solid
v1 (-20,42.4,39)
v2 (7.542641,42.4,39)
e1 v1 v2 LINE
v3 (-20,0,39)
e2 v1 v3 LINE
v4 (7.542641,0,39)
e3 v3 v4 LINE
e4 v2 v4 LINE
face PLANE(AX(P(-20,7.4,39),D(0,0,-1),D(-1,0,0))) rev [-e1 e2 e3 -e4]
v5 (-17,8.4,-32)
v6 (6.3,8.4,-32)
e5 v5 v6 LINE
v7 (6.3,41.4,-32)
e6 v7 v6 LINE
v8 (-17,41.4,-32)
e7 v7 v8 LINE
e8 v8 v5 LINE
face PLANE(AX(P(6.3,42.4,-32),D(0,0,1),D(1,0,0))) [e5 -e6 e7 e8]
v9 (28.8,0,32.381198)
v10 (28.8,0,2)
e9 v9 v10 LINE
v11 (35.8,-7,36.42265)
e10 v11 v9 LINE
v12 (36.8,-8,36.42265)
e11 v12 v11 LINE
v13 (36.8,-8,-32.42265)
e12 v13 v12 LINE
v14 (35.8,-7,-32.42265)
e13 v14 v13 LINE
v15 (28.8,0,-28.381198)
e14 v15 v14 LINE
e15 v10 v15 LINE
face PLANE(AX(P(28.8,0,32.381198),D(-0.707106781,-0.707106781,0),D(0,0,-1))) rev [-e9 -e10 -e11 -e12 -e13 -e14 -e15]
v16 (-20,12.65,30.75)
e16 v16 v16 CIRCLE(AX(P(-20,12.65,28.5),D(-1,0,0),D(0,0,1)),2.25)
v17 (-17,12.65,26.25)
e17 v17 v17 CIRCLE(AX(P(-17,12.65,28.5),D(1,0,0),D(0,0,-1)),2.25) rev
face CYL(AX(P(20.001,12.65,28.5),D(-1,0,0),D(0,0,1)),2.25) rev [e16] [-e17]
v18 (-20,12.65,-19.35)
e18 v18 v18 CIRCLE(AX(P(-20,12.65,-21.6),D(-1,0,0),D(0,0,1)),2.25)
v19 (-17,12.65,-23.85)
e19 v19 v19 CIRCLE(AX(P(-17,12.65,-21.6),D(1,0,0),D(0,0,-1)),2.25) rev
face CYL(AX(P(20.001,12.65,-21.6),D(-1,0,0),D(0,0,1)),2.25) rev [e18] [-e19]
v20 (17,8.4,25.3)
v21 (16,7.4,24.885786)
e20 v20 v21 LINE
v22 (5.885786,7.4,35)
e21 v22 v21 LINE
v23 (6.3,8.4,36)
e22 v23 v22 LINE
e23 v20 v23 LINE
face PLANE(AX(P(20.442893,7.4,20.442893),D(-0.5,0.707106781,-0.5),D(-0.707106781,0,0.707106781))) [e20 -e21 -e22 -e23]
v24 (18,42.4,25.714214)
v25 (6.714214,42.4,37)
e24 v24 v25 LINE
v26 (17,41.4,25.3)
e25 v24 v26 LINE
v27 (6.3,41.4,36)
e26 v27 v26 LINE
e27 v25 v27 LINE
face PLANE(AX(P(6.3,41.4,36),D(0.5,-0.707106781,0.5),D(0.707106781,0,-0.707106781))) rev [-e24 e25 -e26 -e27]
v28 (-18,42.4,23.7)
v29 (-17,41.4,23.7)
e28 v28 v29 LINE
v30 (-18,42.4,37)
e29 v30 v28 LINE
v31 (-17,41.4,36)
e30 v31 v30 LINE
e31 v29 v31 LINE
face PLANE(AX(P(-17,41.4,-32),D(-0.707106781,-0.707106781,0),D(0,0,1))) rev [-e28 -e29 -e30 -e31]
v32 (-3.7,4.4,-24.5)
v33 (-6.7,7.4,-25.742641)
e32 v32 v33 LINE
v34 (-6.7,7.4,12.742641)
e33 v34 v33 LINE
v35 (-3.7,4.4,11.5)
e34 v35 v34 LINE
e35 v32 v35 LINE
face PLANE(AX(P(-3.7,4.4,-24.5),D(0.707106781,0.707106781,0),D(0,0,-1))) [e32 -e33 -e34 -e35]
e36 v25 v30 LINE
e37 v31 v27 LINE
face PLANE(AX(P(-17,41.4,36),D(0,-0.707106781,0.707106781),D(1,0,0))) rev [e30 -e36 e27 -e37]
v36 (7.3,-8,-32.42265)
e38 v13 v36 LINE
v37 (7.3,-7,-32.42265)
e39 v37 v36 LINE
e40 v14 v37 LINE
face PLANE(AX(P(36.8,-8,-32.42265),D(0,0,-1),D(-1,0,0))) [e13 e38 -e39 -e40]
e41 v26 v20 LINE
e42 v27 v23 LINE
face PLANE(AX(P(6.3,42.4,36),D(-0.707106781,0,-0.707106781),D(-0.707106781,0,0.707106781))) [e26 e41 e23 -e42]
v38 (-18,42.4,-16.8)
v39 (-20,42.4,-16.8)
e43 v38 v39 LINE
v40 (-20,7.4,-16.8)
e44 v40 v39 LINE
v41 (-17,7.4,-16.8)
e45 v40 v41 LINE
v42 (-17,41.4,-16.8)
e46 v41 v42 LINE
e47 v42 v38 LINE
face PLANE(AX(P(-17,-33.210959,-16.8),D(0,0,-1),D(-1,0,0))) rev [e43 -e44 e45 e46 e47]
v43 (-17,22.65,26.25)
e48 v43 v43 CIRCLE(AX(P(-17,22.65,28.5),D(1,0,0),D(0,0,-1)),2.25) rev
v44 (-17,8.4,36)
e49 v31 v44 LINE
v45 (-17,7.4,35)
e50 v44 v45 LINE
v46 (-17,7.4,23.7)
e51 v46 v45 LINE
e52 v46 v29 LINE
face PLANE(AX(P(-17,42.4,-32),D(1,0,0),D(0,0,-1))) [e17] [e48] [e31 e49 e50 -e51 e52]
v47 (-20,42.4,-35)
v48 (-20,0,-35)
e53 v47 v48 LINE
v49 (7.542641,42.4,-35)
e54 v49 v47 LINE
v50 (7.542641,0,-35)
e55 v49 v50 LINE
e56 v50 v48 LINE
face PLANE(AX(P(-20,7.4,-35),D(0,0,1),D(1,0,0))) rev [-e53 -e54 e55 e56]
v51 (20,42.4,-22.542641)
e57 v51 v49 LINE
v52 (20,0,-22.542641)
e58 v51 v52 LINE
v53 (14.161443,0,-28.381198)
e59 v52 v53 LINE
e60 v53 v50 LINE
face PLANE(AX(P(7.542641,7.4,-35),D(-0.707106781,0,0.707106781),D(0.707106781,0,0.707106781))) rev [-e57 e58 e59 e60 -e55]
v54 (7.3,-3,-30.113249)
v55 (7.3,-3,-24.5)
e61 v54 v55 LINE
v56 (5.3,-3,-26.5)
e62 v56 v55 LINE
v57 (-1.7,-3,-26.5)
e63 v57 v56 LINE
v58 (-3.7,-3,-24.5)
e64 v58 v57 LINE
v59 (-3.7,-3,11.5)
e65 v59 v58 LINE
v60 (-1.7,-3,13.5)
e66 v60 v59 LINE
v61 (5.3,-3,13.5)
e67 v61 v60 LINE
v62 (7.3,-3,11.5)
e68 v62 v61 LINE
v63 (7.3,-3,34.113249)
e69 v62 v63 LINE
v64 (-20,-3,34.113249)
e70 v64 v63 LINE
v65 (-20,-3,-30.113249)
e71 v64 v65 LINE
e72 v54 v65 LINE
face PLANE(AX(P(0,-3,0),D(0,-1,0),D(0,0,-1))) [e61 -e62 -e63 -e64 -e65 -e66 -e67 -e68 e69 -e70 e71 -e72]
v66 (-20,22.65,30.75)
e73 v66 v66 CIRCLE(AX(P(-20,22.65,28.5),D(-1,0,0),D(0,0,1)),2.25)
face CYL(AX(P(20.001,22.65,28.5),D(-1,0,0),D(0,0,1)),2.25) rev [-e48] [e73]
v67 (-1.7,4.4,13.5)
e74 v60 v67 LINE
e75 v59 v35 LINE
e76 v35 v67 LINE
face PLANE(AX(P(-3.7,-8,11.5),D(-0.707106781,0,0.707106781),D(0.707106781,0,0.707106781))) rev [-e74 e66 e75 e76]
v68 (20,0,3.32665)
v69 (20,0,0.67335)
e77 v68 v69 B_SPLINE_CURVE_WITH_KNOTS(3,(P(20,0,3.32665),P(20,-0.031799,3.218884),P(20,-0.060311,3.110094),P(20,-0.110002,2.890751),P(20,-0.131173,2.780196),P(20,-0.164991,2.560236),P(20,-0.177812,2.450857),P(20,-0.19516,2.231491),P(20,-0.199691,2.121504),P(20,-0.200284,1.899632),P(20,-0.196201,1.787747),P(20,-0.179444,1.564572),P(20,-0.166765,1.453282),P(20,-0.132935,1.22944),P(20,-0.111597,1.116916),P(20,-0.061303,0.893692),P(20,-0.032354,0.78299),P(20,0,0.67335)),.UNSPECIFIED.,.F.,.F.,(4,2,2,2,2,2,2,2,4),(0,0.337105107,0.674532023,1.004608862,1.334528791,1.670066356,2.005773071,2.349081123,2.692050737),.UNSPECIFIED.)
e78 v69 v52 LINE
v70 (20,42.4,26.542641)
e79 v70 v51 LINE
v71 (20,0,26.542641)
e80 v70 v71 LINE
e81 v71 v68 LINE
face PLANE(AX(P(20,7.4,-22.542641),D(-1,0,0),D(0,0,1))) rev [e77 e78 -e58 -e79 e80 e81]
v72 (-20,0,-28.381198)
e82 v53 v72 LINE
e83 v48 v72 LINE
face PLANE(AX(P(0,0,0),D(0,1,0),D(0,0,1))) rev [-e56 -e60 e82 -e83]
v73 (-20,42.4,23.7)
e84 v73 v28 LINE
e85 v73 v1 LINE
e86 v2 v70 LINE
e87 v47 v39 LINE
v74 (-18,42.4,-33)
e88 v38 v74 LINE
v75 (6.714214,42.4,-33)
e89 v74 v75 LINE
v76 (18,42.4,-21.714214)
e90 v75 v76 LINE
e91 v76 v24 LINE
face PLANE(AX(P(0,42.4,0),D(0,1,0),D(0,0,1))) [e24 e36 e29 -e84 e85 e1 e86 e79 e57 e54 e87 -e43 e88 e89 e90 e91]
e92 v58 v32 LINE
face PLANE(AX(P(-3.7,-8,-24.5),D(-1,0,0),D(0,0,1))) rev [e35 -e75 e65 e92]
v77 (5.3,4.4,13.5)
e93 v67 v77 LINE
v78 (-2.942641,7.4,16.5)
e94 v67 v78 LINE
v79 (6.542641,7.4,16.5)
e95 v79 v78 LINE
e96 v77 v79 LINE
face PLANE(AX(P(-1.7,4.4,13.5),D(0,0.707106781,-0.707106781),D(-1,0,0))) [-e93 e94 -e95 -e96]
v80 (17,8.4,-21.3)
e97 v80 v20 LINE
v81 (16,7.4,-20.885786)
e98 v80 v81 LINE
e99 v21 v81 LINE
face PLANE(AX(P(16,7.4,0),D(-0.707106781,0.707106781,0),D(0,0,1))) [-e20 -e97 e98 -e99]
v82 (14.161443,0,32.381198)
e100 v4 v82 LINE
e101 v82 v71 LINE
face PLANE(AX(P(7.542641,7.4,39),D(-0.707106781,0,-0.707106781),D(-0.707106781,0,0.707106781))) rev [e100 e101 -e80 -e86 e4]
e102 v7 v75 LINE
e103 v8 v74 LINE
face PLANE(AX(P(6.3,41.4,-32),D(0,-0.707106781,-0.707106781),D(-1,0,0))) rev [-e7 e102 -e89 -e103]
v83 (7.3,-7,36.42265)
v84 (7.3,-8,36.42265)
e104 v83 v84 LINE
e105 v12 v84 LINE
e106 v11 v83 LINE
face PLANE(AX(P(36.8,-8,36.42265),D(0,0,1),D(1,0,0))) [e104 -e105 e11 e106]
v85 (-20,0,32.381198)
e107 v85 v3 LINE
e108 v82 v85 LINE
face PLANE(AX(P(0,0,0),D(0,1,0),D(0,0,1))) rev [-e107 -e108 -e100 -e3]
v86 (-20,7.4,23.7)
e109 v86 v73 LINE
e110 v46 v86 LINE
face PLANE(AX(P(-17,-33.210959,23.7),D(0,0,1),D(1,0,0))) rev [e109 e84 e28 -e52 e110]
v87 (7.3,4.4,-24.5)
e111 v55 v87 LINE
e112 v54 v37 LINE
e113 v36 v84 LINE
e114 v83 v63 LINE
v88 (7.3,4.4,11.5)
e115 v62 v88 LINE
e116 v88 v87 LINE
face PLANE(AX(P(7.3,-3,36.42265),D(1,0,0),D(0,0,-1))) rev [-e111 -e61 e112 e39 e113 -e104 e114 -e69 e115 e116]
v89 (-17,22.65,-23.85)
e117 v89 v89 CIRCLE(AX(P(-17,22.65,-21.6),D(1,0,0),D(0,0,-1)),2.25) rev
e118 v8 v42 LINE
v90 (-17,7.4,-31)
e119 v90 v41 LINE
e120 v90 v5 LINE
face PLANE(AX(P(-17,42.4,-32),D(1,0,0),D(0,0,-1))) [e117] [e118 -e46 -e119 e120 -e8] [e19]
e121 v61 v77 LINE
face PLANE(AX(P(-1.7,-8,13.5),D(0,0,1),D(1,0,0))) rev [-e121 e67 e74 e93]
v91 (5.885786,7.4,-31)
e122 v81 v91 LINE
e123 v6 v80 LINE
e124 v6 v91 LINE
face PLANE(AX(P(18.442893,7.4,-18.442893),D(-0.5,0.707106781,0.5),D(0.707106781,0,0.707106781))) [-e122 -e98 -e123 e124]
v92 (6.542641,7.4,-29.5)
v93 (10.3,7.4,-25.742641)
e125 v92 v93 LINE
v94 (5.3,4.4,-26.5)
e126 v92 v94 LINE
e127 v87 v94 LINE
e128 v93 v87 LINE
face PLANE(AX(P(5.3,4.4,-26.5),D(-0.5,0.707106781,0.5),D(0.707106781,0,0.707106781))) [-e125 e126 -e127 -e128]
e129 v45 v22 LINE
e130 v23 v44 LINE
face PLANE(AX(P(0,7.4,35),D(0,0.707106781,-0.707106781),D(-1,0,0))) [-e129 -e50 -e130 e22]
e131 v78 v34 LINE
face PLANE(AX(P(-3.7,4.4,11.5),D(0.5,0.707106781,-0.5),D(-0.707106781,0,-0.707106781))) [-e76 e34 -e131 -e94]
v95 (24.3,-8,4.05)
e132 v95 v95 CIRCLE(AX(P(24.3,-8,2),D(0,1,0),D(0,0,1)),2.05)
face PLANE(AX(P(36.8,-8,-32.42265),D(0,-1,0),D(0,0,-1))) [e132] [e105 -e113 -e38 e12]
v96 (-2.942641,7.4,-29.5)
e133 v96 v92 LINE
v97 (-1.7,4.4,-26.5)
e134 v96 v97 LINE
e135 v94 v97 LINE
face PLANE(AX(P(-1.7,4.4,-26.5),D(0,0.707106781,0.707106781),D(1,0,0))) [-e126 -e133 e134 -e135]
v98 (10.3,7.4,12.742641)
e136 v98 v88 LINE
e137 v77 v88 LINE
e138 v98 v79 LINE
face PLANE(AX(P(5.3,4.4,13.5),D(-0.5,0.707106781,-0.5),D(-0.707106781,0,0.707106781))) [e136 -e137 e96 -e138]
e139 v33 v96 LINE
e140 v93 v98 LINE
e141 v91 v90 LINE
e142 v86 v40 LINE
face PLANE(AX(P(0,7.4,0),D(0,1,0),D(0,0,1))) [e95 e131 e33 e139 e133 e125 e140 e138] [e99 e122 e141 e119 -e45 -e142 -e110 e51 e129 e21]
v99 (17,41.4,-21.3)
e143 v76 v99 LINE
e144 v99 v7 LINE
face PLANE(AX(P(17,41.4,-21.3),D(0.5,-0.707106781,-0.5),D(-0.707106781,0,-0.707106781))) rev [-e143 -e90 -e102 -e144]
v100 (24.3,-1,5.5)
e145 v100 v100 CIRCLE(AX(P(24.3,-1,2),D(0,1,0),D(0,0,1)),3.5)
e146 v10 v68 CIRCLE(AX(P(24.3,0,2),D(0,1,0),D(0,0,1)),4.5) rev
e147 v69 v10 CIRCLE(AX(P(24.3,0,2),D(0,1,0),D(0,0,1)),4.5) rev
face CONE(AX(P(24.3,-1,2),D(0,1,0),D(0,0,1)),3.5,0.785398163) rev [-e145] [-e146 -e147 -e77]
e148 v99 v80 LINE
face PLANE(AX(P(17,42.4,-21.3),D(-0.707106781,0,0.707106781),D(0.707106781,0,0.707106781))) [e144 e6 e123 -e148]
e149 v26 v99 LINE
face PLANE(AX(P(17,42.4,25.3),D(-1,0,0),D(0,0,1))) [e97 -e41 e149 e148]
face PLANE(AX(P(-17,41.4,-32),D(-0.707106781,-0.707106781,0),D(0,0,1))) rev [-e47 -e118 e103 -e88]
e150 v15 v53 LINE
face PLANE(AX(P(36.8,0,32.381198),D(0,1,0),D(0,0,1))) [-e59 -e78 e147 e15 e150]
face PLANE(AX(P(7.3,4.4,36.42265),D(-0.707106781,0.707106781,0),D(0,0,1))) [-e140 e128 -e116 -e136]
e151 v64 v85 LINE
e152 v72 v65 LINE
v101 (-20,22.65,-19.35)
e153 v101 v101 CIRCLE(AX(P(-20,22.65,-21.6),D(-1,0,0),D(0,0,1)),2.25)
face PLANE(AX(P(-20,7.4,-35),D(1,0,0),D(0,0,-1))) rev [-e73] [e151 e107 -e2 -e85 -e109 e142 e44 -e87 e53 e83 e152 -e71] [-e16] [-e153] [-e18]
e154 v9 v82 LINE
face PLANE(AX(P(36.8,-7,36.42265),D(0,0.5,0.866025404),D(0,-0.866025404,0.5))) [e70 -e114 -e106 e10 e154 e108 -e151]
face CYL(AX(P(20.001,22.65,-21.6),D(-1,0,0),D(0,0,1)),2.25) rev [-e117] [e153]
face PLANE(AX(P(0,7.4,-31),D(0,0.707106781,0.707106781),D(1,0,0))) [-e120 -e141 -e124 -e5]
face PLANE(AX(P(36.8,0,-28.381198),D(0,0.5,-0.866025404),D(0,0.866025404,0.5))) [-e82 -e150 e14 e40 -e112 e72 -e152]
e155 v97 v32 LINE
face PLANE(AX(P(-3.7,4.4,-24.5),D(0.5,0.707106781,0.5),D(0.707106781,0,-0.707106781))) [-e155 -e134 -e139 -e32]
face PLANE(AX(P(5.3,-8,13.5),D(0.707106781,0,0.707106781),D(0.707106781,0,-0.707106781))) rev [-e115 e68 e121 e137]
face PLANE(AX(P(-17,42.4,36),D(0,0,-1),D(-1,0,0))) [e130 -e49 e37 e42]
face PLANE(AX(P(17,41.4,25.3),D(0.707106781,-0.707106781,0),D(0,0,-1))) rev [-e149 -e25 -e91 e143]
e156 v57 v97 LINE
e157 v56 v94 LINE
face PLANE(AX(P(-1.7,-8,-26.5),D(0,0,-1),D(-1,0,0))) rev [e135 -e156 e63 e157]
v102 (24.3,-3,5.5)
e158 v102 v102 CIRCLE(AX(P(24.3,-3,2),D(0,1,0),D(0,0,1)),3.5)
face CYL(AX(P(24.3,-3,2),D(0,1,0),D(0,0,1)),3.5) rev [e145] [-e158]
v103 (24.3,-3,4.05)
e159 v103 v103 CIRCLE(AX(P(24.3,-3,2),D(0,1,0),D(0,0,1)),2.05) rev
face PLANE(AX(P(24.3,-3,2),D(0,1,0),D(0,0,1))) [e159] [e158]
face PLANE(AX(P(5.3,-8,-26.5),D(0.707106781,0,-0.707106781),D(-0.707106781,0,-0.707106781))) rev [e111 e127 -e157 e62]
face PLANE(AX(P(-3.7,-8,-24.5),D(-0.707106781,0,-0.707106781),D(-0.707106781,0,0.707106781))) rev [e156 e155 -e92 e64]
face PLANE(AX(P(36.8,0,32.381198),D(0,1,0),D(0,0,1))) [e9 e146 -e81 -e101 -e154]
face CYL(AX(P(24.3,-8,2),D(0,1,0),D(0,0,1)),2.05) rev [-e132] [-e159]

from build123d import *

# Parameters (mm, degrees)
MAIN_FACE_EXTRUDE_DEPTH              = 7.4
MAIN_WALLS_EXTRUDE_DEPTH             = 35
MAIN_WALLS_LOWER_CHAMFER_SIZE        = 1
MAIN_WALLS_ENTRY_CHAMFER_SIZE        = 1
SKETCH4_W                            = 3
SKETCH4_H                            = 40.5
SERVO_MOUNT_CUT_DEPTH                = 35
SERVO_MOUNT_HOLES_REACH              = 72.134
SKETCH5_R                            = 2.25
MOUNT_DOVETAIL_DEPTH                 = 56.8
MOUNT_DOVETAIL_CHAMFER_SIZE          = 8
SKETCH9_W                            = 27.3
SKETCH9_H                            = 68.845299462
DOVETAIL_OFFSET_CUT_DEPTH            = 5
SKETCH10_R                           = 2.05
MOUNT_SCREW_HOLE_DEPTH               = 69.359344643
SKETCH11_R                           = 3.5
MOUNT_SCREW_COUNTERSINK_DEPTH        = 3
MOUNT_SCREW_COUNTERSINK_CHAMFER_SIZE = 1
GEAR_CUT_DEPTH                       = 65.033116432
GEAR_ENTRY_CHAMFER_SIZE              = 3


# Some blends are built 0.0001 mm under size
with BuildPart() as part:
    # Sketch1 → Main Face Extrude (new body)
    with BuildSketch(Plane(origin=(0, 0, 0), x_dir=(1, 0, 0), z_dir=(0, 1, 0))):
        Polygon((-20, 35), (7.542640687, 35), (20, 22.542640687), (20, -26.542640687), (7.542640687, -39), (-20, -39), align=None)
    extrude(amount=MAIN_FACE_EXTRUDE_DEPTH)

    # Sketch3 → Main Walls Extrude (add)
    with BuildSketch(Plane(origin=(0, 7.4, 0), x_dir=(1, 0, 0), z_dir=(0, 1, 0))):
        Polygon((-20, 35), (-20, -39), (7.542640687, -39), (20, -26.542640687), (20, 22.542640687), (7.542640687, 35), align=None)
        Polygon((-17, 32), (-17, -36), (6.3, -36), (17, -25.3), (17, 21.3), (6.3, 32), align=None, mode=Mode.SUBTRACT)
    extrude(amount=MAIN_WALLS_EXTRUDE_DEPTH)

    # Main Walls Lower Chamfer
    main_walls_lower_chamfer_edges = [part.edges().sort_by_distance(p)[0] for p in [
        (-5.35, 7.4, -32),
        (-5.35, 7.4, 36),
        (11.65, 7.4, 30.65),
        (17, 7.4, 2),
        (11.65, 7.4, -26.65),
    ]]
    chamfer(main_walls_lower_chamfer_edges, length=MAIN_WALLS_LOWER_CHAMFER_SIZE)

    # Main Walls Entry Chamfer
    main_walls_entry_chamfer_edges = [part.edges().sort_by_distance(p)[0] for p in [
        (-5.35, 42.4, -32),
        (-17, 42.4, 2),
        (-5.35, 42.4, 36),
        (11.65, 42.4, 30.65),
        (17, 42.4, 2),
        (11.65, 42.4, -26.65),
    ]]
    chamfer(main_walls_entry_chamfer_edges, length=MAIN_WALLS_ENTRY_CHAMFER_SIZE)

    # Sketch4 → Servo Mount Cut (cut)
    with BuildSketch(Plane(origin=(0, 42.4, 0), x_dir=(1, 0, 0), z_dir=(0, 1, 0))):
        with Locations((-18.5, -3.45)):
            Rectangle(SKETCH4_W, SKETCH4_H)
    extrude(amount=-SERVO_MOUNT_CUT_DEPTH, mode=Mode.SUBTRACT)

    # Sketch5 → Servo Mount Holes (cut, up to next)
    with BuildSketch(Plane.ZY.offset(20), mode=Mode.PRIVATE) as servo_mount_holes_sk1:
        with Locations((-21.6, 22.65)):
            Circle(SKETCH5_R)
    servo_mount_holes_tool1 = extrude(servo_mount_holes_sk1.sketch, amount=-SERVO_MOUNT_HOLES_REACH, mode=Mode.PRIVATE) & part.part
    # Sketch5 → Servo Mount Holes (cut, up to next)
    with BuildSketch(Plane.ZY.offset(20), mode=Mode.PRIVATE) as servo_mount_holes_sk2:
        with Locations((-21.6, 12.65)):
            Circle(SKETCH5_R)
    servo_mount_holes_tool2 = extrude(servo_mount_holes_sk2.sketch, amount=-SERVO_MOUNT_HOLES_REACH, mode=Mode.PRIVATE) & part.part
    # Sketch5 → Servo Mount Holes (cut, up to next)
    with BuildSketch(Plane.ZY.offset(20), mode=Mode.PRIVATE) as servo_mount_holes_sk3:
        with Locations((28.5, 22.65)):
            Circle(SKETCH5_R)
    servo_mount_holes_tool3 = extrude(servo_mount_holes_sk3.sketch, amount=-SERVO_MOUNT_HOLES_REACH, mode=Mode.PRIVATE) & part.part
    # Sketch5 → Servo Mount Holes (cut, up to next)
    with BuildSketch(Plane.ZY.offset(20), mode=Mode.PRIVATE) as servo_mount_holes_sk4:
        with Locations((28.5, 12.65)):
            Circle(SKETCH5_R)
    servo_mount_holes_tool4 = extrude(servo_mount_holes_sk4.sketch, amount=-SERVO_MOUNT_HOLES_REACH, mode=Mode.PRIVATE) & part.part
    add(servo_mount_holes_tool1.solids().sort_by_distance((-20, 22.65, -21.6))[0], mode=Mode.SUBTRACT)
    add(servo_mount_holes_tool2.solids().sort_by_distance((-20, 12.65, -21.6))[0], mode=Mode.SUBTRACT)
    add(servo_mount_holes_tool3.solids().sort_by_distance((-20, 22.65, 28.5))[0], mode=Mode.SUBTRACT)
    add(servo_mount_holes_tool4.solids().sort_by_distance((-20, 12.65, 28.5))[0], mode=Mode.SUBTRACT)

    # Sketch8 → Mount Dovetail (add)
    with BuildSketch(Plane.ZY.offset(20)):
        Polygon((-28.381197846, 0), (-32.422649731, -7), (-32.422649731, -8), (36.422649731, -8), (36.422649731, -7), (32.381197846, 0), align=None)
    extrude(amount=-MOUNT_DOVETAIL_DEPTH)

    # Mount Dovetail Chamfer
    mount_dovetail_chamfer_edges = [part.edges().sort_by_distance(p)[0] for p in [
        (36.8, 0, 2),
    ]]
    chamfer(mount_dovetail_chamfer_edges, length=MOUNT_DOVETAIL_CHAMFER_SIZE - 0.0001)  # a hair under: the kernel refuses the full size

    # Sketch9 → Dovetail Offset Cut (cut)
    with BuildSketch(Plane.XZ.offset(8)):
        with Locations((-6.35, 2)):
            Rectangle(SKETCH9_W, SKETCH9_H)
    extrude(amount=-DOVETAIL_OFFSET_CUT_DEPTH, mode=Mode.SUBTRACT)

    # Sketch10 → Mount Screw Hole (cut, through all)
    with BuildSketch(Plane(origin=(0, 0, 0), x_dir=(1, 0, 0), z_dir=(0, 1, 0))):
        with Locations(Location((24.3, -2, 0), (0, 0, 270))):
            Circle(SKETCH10_R)
    extrude(amount=-MOUNT_SCREW_HOLE_DEPTH, mode=Mode.SUBTRACT)

    # Sketch11 → Mount Screw Countersink (cut)
    with BuildSketch(Plane(origin=(0, 0, 0), x_dir=(1, 0, 0), z_dir=(0, 1, 0))):
        with Locations(Location((24.3, -2, 0), (0, 0, 270))):
            Circle(SKETCH11_R)
    extrude(amount=-MOUNT_SCREW_COUNTERSINK_DEPTH, mode=Mode.SUBTRACT)

    # Mount Screw Countersink Chamfer
    # the kernel refuses this chamfer: 1 mm, written as the material it takes off along each edge
    with BuildSketch(Plane(origin=(24.3, 0, 2), x_dir=(0, 0, 1), z_dir=(-1, 0, 0))) as mount_screw_countersink_chamfer_piece_1_section:
        Polygon((3.5 + MOUNT_SCREW_COUNTERSINK_CHAMFER_SIZE, 0), (3.5, -MOUNT_SCREW_COUNTERSINK_CHAMFER_SIZE), (3.5, 0), align=None)
    mount_screw_countersink_chamfer_piece_1 = revolve(axis=Axis((24.3, 0, 2), (0, 1, 0)), mode=Mode.PRIVATE)
    mount_screw_countersink_chamfer_piece_1 = split(mount_screw_countersink_chamfer_piece_1, bisect_by=Plane(origin=(20, -0.483290811, -1.983290811), z_dir=(1, 0, 0)), keep=Keep.TOP, mode=Mode.PRIVATE)
    add(mount_screw_countersink_chamfer_piece_1, mode=Mode.SUBTRACT)

    # Sketch2 → Gear Cut (cut, through all)
    with BuildSketch(Plane(origin=(0, 7.4, 0), x_dir=(1, 0, 0), z_dir=(0, 1, 0))):
        Polygon((-1.7, 26.5), (5.3, 26.5), (7.3, 24.5), (7.3, -11.5), (5.3, -13.5), (-1.7, -13.5), (-3.7, -11.5), (-3.7, 24.5), align=None)
    extrude(amount=-GEAR_CUT_DEPTH, mode=Mode.SUBTRACT)

    # Gear Entry Chamfer
    gear_entry_chamfer_edges = [part.edges().sort_by_distance(p)[0] for p in [
        (-2.7, 7.4, -25.5),
        (-3.7, 7.4, -6.5),
        (-2.7, 7.4, 12.5),
        (1.8, 7.4, 13.5),
        (6.3, 7.4, 12.5),
        (7.3, 7.4, -6.5),
        (6.3, 7.4, -25.5),
        (1.8, 7.4, -26.5),
    ]]
    chamfer(gear_entry_chamfer_edges, length=GEAR_ENTRY_CHAMFER_SIZE)


solid = part.part
